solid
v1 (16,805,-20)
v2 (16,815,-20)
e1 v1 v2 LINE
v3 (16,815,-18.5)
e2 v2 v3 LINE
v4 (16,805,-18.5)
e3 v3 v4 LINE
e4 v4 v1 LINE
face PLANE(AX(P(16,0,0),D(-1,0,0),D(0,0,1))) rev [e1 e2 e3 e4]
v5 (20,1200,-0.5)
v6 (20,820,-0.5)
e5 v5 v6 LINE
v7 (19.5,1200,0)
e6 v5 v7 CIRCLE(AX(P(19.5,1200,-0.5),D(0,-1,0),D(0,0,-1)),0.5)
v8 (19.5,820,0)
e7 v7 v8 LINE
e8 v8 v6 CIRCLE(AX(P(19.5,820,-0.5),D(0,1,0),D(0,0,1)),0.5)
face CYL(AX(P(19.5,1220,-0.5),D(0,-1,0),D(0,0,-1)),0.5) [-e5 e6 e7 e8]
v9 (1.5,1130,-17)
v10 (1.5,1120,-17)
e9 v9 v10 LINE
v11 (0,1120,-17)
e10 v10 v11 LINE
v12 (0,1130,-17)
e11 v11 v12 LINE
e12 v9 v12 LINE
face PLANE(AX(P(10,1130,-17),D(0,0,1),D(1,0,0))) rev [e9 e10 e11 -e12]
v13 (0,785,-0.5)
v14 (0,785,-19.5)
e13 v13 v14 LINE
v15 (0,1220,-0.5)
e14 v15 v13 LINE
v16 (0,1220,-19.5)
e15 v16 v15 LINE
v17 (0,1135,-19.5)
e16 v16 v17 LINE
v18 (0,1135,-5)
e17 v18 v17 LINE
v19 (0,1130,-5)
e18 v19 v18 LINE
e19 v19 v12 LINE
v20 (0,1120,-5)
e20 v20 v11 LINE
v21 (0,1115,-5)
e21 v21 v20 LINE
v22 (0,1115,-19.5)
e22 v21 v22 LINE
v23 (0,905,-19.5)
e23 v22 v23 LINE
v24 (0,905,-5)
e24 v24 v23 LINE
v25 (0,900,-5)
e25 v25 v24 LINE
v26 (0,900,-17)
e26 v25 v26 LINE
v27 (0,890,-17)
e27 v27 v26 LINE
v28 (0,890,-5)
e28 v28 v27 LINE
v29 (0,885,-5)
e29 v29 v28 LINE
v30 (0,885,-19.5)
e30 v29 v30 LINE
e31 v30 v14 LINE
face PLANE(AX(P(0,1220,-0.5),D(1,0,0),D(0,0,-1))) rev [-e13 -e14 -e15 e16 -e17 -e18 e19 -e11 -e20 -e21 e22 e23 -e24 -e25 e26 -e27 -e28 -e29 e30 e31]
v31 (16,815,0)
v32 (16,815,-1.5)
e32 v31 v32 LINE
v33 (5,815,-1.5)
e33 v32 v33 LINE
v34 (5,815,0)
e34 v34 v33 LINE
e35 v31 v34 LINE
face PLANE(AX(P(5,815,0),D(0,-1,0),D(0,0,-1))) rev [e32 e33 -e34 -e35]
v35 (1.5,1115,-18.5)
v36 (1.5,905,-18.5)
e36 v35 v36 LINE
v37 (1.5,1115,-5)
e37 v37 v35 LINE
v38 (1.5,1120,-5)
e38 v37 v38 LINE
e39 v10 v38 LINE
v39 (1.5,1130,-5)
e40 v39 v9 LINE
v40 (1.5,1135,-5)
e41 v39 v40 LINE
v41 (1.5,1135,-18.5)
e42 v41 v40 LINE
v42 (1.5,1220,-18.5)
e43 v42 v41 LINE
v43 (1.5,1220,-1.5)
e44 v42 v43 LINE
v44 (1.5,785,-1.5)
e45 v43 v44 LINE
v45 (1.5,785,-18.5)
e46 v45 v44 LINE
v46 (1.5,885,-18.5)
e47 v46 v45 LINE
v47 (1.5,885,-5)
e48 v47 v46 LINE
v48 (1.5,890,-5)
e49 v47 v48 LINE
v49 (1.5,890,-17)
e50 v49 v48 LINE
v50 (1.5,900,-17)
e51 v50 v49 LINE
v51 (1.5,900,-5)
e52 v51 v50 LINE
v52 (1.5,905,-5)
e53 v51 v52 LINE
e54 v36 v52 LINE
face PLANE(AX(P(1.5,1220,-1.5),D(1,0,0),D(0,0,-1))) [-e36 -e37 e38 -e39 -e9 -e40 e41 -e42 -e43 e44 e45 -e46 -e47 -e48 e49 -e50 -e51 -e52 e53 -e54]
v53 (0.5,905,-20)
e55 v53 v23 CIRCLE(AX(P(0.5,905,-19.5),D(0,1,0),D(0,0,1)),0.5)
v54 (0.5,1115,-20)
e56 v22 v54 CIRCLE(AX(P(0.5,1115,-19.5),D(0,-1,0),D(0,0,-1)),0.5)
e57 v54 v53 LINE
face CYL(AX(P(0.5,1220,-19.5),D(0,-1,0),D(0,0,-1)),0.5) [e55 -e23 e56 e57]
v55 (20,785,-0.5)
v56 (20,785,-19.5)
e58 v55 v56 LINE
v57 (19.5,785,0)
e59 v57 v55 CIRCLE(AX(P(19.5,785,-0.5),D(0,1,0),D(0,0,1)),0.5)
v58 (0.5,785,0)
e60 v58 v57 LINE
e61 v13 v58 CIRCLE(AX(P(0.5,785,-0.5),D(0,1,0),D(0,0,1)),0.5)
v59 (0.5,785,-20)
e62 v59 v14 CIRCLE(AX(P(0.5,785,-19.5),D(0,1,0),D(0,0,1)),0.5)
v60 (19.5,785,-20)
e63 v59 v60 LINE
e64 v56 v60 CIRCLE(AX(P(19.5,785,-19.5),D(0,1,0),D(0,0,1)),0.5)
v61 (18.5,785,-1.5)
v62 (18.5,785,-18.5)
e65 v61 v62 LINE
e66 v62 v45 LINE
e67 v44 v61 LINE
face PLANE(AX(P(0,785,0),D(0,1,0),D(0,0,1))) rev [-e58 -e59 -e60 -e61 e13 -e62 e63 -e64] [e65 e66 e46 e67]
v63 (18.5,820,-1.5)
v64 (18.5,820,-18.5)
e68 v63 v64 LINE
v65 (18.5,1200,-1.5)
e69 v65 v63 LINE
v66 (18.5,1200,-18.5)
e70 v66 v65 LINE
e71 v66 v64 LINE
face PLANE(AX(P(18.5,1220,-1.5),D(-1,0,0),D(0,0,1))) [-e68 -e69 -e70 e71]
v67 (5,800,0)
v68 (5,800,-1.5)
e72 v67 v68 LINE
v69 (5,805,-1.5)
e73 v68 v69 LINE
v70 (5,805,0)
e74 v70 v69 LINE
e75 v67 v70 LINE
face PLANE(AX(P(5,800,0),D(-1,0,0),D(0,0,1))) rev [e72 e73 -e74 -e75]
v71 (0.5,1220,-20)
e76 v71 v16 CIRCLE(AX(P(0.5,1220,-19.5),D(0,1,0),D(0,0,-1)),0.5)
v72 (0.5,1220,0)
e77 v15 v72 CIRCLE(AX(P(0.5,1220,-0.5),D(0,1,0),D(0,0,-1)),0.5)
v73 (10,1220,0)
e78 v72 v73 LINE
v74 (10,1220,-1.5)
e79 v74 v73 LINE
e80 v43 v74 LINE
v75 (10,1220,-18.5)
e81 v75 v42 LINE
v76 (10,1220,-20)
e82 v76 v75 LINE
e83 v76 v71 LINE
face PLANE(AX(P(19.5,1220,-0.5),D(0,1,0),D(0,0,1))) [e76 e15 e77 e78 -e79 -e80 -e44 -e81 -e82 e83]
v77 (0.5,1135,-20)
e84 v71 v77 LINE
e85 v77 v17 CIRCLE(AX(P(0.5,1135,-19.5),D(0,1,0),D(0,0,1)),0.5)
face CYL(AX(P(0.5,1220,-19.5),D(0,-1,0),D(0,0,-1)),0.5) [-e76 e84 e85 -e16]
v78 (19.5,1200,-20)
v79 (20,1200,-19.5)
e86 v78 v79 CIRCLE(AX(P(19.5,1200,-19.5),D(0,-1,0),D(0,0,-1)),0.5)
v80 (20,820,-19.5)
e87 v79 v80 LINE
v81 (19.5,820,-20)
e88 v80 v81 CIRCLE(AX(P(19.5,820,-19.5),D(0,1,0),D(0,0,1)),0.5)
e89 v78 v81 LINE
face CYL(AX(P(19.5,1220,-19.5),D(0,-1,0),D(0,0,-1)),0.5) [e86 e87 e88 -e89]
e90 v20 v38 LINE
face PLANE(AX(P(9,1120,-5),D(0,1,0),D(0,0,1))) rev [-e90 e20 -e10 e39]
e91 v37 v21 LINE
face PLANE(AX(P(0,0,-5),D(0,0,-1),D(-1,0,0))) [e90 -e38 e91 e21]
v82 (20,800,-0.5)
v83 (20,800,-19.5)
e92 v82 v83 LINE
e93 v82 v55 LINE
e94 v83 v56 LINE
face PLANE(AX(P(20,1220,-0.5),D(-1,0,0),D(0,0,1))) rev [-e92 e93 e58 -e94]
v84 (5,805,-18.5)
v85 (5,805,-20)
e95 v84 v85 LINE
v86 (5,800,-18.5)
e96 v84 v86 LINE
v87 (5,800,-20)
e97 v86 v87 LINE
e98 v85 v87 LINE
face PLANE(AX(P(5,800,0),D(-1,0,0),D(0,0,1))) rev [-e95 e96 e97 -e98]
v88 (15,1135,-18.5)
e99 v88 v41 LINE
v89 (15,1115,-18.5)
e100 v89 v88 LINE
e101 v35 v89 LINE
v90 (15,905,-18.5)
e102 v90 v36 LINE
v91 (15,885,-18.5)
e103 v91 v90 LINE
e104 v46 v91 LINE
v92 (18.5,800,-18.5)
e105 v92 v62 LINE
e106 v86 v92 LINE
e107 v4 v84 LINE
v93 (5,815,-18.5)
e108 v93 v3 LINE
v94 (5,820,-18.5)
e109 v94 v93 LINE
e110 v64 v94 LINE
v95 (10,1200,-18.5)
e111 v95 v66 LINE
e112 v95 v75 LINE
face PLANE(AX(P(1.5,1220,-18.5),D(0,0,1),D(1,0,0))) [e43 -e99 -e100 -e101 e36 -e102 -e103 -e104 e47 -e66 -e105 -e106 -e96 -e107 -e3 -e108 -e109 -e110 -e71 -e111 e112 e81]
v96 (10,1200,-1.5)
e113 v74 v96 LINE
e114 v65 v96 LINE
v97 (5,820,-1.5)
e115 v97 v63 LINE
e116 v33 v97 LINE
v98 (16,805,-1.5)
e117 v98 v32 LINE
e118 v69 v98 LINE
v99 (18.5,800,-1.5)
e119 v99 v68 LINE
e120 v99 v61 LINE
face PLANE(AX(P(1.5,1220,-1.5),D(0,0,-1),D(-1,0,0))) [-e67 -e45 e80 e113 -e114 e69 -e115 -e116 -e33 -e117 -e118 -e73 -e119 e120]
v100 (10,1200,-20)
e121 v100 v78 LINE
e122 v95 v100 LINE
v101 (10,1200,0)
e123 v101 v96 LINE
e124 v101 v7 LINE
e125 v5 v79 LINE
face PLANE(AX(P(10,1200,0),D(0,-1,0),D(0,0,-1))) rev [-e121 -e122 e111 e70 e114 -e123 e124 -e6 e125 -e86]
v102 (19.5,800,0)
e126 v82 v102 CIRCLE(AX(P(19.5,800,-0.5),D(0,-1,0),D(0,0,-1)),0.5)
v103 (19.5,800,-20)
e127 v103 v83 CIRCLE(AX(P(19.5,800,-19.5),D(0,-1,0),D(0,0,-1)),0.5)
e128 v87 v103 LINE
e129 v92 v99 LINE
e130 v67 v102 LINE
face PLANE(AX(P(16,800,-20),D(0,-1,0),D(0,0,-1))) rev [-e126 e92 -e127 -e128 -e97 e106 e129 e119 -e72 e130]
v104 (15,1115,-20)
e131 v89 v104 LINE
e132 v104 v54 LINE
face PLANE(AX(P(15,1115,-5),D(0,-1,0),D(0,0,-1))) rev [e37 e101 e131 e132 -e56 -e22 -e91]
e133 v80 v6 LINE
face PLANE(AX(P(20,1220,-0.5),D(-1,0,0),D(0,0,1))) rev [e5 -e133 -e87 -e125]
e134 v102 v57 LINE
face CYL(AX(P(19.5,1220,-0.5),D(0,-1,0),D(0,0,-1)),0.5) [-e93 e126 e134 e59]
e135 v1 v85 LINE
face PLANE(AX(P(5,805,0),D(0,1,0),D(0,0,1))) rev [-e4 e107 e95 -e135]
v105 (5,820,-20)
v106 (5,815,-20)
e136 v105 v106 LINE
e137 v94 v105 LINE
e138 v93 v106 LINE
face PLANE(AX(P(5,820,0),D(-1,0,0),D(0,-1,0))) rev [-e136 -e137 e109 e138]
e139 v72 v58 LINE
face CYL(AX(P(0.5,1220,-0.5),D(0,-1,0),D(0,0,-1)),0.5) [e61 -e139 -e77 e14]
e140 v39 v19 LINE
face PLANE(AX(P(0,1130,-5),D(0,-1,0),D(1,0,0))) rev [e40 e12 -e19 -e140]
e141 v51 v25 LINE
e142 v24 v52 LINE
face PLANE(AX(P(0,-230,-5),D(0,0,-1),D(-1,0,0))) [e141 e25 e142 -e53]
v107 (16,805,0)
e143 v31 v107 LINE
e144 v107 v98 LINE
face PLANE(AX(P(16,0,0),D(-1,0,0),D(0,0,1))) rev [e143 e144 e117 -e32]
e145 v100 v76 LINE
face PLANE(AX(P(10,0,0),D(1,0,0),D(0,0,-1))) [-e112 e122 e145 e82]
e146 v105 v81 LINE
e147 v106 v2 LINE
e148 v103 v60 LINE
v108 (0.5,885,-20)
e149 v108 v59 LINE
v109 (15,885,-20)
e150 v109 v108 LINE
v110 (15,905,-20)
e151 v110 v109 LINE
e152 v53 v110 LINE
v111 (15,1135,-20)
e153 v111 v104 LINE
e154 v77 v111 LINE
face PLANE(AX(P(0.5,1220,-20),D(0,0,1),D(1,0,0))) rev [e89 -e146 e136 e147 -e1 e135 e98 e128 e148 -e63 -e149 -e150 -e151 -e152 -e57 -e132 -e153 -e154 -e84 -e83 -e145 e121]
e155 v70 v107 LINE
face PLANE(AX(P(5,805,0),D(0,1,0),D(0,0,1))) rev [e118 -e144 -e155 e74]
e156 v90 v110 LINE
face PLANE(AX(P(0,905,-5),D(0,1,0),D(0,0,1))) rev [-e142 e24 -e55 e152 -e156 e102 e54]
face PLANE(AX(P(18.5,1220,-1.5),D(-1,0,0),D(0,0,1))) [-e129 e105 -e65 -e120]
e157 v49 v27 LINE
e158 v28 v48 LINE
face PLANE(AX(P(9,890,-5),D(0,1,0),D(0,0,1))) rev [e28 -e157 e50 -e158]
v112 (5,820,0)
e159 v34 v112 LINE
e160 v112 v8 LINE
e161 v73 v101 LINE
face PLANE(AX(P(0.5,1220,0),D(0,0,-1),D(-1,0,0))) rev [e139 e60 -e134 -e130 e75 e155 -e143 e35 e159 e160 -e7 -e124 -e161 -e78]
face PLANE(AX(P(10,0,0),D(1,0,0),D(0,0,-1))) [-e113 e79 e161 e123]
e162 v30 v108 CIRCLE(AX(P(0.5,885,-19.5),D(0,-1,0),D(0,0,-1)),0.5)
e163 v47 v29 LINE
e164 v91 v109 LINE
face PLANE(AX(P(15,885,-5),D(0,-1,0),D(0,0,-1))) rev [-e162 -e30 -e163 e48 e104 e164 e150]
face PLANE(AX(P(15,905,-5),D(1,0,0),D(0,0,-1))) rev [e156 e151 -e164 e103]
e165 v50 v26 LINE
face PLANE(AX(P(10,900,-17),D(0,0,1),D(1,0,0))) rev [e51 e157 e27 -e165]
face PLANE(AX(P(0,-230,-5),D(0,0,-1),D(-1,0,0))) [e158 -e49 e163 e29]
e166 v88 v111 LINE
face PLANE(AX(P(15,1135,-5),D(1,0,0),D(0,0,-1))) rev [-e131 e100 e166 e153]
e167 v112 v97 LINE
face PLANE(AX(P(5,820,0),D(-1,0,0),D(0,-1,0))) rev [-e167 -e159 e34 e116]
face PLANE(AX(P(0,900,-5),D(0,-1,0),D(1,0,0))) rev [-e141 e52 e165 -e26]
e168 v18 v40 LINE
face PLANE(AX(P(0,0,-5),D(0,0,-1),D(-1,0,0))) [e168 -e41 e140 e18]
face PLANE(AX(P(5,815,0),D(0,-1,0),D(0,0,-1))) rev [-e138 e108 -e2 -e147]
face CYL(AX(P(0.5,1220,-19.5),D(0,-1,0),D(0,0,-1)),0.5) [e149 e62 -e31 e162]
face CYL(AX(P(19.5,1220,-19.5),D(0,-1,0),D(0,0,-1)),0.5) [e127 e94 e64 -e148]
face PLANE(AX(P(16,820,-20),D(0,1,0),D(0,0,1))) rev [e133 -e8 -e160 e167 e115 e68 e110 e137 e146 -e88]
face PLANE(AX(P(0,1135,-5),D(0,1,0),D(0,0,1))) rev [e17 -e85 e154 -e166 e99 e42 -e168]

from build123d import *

# Parameters (mm, degrees)
SKETCH1_W                   = 17
SKETCH1_H                   = 17
BOSS_EXTRUDE1_DEPTH         = 1220
SKETCH2_W                   = 20
SKETCH2_H                   = 20
CUT_EXTRUDE1_DEPTH          = 10
CUT_EXTRUDE2_DEPTH          = 15
SKETCH4_W                   = 3
SKETCH4_H                   = 10
CUT_EXTRUDE3_DEPTH          = 10
SKETCH_PATTERN1_START       = -20
SKETCH_PATTERN1_DEPTH       = 15
SKETCH_PATTERN1_2_OUTLINE_W = 1.5
SKETCH_PATTERN1_2_OUTLINE_H = 10
SKETCH_PATTERN1_2_DEPTH     = 3
SKETCH6_W                   = 20
SKETCH6_H                   = 20
CUT_EXTRUDE4_DEPTH          = 4
CUT_EXTRUDE5_DEPTH          = 1221.327824808
CUT_EXTRUDE5_DEPTH_BACK     = 1221.327824808
SKETCH7_W                   = 11
SKETCH7_H                   = 5
SKETCH8_W                   = 20.081282068
SKETCH8_H                   = 792.599518512
CUT_EXTRUDE6_DEPTH          = 20


# Read off the part's stored shape, not the designer's step: Sketch-Pattern1
with BuildPart() as part:
    # Sketch1 → Boss-Extrude1 (new body)
    with BuildSketch(Plane(origin=(0, 0, 0), x_dir=(1, 0, 0), z_dir=(0, 1, 0))):
        with BuildLine():
            Line((0.5, 0), (19.5, 0))
            ThreePointArc((19.5, 0), (19.853553391, 0.146446609), (20, 0.5))
            Line((20, 0.5), (20, 19.5))
            ThreePointArc((20, 19.5), (19.853553391, 19.853553391), (19.5, 20))
            Line((19.5, 20), (0.5, 20))
            ThreePointArc((0.5, 20), (0.146446609, 19.853553391), (0, 19.5))
            Line((0, 19.5), (0, 0.5))
            ThreePointArc((0, 0.5), (0.146446609, 0.146446609), (0.5, 0))
        make_face()
        with Locations((10, 10)):
            Rectangle(SKETCH1_W, SKETCH1_H, mode=Mode.SUBTRACT)
    extrude(amount=BOSS_EXTRUDE1_DEPTH)

    # Sketch2 → Cut-Extrude1 (cut)
    with BuildSketch(Plane(origin=(20, 0, 0), x_dir=(0, 0, -1), z_dir=(1, 0, 0))):
        with Locations((10, 1210)):
            Rectangle(SKETCH2_W, SKETCH2_H)
        with Locations((10, 10)):
            Rectangle(SKETCH2_W, SKETCH2_H)
    extrude(amount=-CUT_EXTRUDE1_DEPTH, mode=Mode.SUBTRACT)

    # Sketch3 → Cut-Extrude2 (cut)
    with BuildSketch(Plane(origin=(0, 0, -20), x_dir=(-1, 0, 0), z_dir=(0, 0, -1))):
        Polygon((-15, 1115), (0, 1115), (0, 1120), (-9, 1120), (-9, 1130), (0, 1130), (0, 1135), (-15, 1135), align=None)
    extrude(amount=-CUT_EXTRUDE2_DEPTH, mode=Mode.SUBTRACT)

    # Sketch4 → Cut-Extrude3 (cut)
    with BuildSketch(Plane.ZY):
        with Locations((-18.5, 1125)):
            Rectangle(SKETCH4_W, SKETCH4_H)
    extrude(amount=-CUT_EXTRUDE3_DEPTH, mode=Mode.SUBTRACT)

    # Sketch-Pattern1 outline → Sketch-Pattern1 (cut)
    with BuildSketch(Plane.XY.offset(SKETCH_PATTERN1_START)):
        Polygon((15, 105), (15, 125), (0, 125), (0, 120), (1.5, 120), (1.5, 110), (0, 110), (0, 105), align=None)
        Polygon((1.5, 350), (1.5, 340), (0, 340), (0, 335), (15, 335), (15, 355), (0, 355), (0, 350), align=None)
        Polygon((1.5, 510), (1.5, 500), (0, 500), (0, 495), (15, 495), (15, 515), (0, 515), (0, 510), align=None)
        Polygon((1.5, 740), (1.5, 730), (0, 730), (0, 725), (15, 725), (15, 745), (0, 745), (0, 740), align=None)
        Polygon((1.5, 900), (1.5, 890), (0, 890), (0, 885), (15, 885), (15, 905), (0, 905), (0, 900), align=None)
    extrude(amount=SKETCH_PATTERN1_DEPTH, mode=Mode.SUBTRACT)

    # Sketch-Pattern1 2 outline → Sketch-Pattern1 2 (cut)
    with BuildSketch(Plane.XY.offset(SKETCH_PATTERN1_START)):
        with Locations((0.75, 115)):
            Rectangle(SKETCH_PATTERN1_2_OUTLINE_W, SKETCH_PATTERN1_2_OUTLINE_H)
        with Locations((0.75, 345)):
            Rectangle(SKETCH_PATTERN1_2_OUTLINE_W, SKETCH_PATTERN1_2_OUTLINE_H)
        with Locations((0.75, 505)):
            Rectangle(SKETCH_PATTERN1_2_OUTLINE_W, SKETCH_PATTERN1_2_OUTLINE_H)
        with Locations((0.75, 735)):
            Rectangle(SKETCH_PATTERN1_2_OUTLINE_W, SKETCH_PATTERN1_2_OUTLINE_H)
        with Locations((0.75, 895)):
            Rectangle(SKETCH_PATTERN1_2_OUTLINE_W, SKETCH_PATTERN1_2_OUTLINE_H)
    extrude(amount=SKETCH_PATTERN1_2_DEPTH, mode=Mode.SUBTRACT)

    # Sketch6 → Cut-Extrude4 (cut)
    with BuildSketch(Plane(origin=(20, 0, 0), x_dir=(0, 0, -1), z_dir=(1, 0, 0))):
        with Locations((10, 810)):
            Rectangle(SKETCH6_W, SKETCH6_H)
    extrude(amount=-CUT_EXTRUDE4_DEPTH, mode=Mode.SUBTRACT)

    # Sketch7 → Cut-Extrude5 (cut, two sides: drawn at the far end of the back side and taken through both)
    with BuildSketch(Plane(origin=(0, 0, -20), x_dir=(-1, 0, 0), z_dir=(0, 0, -1)).offset(-CUT_EXTRUDE5_DEPTH_BACK)):
        with Locations((-10.5, 817.5)):
            Rectangle(SKETCH7_W, SKETCH7_H)
        with Locations((-10.5, 802.5)):
            Rectangle(SKETCH7_W, SKETCH7_H)
    extrude(amount=CUT_EXTRUDE5_DEPTH + CUT_EXTRUDE5_DEPTH_BACK, mode=Mode.SUBTRACT)

    # Sketch8 → Cut-Extrude6 (cut)
    with BuildSketch(Plane(origin=(0, 0, -20), x_dir=(-1, 0, 0), z_dir=(0, 0, -1))):
        with Locations((-10.040641034, 388.700240744)):
            Rectangle(SKETCH8_W, SKETCH8_H)
    extrude(amount=-CUT_EXTRUDE6_DEPTH, mode=Mode.SUBTRACT)


solid = part.part
